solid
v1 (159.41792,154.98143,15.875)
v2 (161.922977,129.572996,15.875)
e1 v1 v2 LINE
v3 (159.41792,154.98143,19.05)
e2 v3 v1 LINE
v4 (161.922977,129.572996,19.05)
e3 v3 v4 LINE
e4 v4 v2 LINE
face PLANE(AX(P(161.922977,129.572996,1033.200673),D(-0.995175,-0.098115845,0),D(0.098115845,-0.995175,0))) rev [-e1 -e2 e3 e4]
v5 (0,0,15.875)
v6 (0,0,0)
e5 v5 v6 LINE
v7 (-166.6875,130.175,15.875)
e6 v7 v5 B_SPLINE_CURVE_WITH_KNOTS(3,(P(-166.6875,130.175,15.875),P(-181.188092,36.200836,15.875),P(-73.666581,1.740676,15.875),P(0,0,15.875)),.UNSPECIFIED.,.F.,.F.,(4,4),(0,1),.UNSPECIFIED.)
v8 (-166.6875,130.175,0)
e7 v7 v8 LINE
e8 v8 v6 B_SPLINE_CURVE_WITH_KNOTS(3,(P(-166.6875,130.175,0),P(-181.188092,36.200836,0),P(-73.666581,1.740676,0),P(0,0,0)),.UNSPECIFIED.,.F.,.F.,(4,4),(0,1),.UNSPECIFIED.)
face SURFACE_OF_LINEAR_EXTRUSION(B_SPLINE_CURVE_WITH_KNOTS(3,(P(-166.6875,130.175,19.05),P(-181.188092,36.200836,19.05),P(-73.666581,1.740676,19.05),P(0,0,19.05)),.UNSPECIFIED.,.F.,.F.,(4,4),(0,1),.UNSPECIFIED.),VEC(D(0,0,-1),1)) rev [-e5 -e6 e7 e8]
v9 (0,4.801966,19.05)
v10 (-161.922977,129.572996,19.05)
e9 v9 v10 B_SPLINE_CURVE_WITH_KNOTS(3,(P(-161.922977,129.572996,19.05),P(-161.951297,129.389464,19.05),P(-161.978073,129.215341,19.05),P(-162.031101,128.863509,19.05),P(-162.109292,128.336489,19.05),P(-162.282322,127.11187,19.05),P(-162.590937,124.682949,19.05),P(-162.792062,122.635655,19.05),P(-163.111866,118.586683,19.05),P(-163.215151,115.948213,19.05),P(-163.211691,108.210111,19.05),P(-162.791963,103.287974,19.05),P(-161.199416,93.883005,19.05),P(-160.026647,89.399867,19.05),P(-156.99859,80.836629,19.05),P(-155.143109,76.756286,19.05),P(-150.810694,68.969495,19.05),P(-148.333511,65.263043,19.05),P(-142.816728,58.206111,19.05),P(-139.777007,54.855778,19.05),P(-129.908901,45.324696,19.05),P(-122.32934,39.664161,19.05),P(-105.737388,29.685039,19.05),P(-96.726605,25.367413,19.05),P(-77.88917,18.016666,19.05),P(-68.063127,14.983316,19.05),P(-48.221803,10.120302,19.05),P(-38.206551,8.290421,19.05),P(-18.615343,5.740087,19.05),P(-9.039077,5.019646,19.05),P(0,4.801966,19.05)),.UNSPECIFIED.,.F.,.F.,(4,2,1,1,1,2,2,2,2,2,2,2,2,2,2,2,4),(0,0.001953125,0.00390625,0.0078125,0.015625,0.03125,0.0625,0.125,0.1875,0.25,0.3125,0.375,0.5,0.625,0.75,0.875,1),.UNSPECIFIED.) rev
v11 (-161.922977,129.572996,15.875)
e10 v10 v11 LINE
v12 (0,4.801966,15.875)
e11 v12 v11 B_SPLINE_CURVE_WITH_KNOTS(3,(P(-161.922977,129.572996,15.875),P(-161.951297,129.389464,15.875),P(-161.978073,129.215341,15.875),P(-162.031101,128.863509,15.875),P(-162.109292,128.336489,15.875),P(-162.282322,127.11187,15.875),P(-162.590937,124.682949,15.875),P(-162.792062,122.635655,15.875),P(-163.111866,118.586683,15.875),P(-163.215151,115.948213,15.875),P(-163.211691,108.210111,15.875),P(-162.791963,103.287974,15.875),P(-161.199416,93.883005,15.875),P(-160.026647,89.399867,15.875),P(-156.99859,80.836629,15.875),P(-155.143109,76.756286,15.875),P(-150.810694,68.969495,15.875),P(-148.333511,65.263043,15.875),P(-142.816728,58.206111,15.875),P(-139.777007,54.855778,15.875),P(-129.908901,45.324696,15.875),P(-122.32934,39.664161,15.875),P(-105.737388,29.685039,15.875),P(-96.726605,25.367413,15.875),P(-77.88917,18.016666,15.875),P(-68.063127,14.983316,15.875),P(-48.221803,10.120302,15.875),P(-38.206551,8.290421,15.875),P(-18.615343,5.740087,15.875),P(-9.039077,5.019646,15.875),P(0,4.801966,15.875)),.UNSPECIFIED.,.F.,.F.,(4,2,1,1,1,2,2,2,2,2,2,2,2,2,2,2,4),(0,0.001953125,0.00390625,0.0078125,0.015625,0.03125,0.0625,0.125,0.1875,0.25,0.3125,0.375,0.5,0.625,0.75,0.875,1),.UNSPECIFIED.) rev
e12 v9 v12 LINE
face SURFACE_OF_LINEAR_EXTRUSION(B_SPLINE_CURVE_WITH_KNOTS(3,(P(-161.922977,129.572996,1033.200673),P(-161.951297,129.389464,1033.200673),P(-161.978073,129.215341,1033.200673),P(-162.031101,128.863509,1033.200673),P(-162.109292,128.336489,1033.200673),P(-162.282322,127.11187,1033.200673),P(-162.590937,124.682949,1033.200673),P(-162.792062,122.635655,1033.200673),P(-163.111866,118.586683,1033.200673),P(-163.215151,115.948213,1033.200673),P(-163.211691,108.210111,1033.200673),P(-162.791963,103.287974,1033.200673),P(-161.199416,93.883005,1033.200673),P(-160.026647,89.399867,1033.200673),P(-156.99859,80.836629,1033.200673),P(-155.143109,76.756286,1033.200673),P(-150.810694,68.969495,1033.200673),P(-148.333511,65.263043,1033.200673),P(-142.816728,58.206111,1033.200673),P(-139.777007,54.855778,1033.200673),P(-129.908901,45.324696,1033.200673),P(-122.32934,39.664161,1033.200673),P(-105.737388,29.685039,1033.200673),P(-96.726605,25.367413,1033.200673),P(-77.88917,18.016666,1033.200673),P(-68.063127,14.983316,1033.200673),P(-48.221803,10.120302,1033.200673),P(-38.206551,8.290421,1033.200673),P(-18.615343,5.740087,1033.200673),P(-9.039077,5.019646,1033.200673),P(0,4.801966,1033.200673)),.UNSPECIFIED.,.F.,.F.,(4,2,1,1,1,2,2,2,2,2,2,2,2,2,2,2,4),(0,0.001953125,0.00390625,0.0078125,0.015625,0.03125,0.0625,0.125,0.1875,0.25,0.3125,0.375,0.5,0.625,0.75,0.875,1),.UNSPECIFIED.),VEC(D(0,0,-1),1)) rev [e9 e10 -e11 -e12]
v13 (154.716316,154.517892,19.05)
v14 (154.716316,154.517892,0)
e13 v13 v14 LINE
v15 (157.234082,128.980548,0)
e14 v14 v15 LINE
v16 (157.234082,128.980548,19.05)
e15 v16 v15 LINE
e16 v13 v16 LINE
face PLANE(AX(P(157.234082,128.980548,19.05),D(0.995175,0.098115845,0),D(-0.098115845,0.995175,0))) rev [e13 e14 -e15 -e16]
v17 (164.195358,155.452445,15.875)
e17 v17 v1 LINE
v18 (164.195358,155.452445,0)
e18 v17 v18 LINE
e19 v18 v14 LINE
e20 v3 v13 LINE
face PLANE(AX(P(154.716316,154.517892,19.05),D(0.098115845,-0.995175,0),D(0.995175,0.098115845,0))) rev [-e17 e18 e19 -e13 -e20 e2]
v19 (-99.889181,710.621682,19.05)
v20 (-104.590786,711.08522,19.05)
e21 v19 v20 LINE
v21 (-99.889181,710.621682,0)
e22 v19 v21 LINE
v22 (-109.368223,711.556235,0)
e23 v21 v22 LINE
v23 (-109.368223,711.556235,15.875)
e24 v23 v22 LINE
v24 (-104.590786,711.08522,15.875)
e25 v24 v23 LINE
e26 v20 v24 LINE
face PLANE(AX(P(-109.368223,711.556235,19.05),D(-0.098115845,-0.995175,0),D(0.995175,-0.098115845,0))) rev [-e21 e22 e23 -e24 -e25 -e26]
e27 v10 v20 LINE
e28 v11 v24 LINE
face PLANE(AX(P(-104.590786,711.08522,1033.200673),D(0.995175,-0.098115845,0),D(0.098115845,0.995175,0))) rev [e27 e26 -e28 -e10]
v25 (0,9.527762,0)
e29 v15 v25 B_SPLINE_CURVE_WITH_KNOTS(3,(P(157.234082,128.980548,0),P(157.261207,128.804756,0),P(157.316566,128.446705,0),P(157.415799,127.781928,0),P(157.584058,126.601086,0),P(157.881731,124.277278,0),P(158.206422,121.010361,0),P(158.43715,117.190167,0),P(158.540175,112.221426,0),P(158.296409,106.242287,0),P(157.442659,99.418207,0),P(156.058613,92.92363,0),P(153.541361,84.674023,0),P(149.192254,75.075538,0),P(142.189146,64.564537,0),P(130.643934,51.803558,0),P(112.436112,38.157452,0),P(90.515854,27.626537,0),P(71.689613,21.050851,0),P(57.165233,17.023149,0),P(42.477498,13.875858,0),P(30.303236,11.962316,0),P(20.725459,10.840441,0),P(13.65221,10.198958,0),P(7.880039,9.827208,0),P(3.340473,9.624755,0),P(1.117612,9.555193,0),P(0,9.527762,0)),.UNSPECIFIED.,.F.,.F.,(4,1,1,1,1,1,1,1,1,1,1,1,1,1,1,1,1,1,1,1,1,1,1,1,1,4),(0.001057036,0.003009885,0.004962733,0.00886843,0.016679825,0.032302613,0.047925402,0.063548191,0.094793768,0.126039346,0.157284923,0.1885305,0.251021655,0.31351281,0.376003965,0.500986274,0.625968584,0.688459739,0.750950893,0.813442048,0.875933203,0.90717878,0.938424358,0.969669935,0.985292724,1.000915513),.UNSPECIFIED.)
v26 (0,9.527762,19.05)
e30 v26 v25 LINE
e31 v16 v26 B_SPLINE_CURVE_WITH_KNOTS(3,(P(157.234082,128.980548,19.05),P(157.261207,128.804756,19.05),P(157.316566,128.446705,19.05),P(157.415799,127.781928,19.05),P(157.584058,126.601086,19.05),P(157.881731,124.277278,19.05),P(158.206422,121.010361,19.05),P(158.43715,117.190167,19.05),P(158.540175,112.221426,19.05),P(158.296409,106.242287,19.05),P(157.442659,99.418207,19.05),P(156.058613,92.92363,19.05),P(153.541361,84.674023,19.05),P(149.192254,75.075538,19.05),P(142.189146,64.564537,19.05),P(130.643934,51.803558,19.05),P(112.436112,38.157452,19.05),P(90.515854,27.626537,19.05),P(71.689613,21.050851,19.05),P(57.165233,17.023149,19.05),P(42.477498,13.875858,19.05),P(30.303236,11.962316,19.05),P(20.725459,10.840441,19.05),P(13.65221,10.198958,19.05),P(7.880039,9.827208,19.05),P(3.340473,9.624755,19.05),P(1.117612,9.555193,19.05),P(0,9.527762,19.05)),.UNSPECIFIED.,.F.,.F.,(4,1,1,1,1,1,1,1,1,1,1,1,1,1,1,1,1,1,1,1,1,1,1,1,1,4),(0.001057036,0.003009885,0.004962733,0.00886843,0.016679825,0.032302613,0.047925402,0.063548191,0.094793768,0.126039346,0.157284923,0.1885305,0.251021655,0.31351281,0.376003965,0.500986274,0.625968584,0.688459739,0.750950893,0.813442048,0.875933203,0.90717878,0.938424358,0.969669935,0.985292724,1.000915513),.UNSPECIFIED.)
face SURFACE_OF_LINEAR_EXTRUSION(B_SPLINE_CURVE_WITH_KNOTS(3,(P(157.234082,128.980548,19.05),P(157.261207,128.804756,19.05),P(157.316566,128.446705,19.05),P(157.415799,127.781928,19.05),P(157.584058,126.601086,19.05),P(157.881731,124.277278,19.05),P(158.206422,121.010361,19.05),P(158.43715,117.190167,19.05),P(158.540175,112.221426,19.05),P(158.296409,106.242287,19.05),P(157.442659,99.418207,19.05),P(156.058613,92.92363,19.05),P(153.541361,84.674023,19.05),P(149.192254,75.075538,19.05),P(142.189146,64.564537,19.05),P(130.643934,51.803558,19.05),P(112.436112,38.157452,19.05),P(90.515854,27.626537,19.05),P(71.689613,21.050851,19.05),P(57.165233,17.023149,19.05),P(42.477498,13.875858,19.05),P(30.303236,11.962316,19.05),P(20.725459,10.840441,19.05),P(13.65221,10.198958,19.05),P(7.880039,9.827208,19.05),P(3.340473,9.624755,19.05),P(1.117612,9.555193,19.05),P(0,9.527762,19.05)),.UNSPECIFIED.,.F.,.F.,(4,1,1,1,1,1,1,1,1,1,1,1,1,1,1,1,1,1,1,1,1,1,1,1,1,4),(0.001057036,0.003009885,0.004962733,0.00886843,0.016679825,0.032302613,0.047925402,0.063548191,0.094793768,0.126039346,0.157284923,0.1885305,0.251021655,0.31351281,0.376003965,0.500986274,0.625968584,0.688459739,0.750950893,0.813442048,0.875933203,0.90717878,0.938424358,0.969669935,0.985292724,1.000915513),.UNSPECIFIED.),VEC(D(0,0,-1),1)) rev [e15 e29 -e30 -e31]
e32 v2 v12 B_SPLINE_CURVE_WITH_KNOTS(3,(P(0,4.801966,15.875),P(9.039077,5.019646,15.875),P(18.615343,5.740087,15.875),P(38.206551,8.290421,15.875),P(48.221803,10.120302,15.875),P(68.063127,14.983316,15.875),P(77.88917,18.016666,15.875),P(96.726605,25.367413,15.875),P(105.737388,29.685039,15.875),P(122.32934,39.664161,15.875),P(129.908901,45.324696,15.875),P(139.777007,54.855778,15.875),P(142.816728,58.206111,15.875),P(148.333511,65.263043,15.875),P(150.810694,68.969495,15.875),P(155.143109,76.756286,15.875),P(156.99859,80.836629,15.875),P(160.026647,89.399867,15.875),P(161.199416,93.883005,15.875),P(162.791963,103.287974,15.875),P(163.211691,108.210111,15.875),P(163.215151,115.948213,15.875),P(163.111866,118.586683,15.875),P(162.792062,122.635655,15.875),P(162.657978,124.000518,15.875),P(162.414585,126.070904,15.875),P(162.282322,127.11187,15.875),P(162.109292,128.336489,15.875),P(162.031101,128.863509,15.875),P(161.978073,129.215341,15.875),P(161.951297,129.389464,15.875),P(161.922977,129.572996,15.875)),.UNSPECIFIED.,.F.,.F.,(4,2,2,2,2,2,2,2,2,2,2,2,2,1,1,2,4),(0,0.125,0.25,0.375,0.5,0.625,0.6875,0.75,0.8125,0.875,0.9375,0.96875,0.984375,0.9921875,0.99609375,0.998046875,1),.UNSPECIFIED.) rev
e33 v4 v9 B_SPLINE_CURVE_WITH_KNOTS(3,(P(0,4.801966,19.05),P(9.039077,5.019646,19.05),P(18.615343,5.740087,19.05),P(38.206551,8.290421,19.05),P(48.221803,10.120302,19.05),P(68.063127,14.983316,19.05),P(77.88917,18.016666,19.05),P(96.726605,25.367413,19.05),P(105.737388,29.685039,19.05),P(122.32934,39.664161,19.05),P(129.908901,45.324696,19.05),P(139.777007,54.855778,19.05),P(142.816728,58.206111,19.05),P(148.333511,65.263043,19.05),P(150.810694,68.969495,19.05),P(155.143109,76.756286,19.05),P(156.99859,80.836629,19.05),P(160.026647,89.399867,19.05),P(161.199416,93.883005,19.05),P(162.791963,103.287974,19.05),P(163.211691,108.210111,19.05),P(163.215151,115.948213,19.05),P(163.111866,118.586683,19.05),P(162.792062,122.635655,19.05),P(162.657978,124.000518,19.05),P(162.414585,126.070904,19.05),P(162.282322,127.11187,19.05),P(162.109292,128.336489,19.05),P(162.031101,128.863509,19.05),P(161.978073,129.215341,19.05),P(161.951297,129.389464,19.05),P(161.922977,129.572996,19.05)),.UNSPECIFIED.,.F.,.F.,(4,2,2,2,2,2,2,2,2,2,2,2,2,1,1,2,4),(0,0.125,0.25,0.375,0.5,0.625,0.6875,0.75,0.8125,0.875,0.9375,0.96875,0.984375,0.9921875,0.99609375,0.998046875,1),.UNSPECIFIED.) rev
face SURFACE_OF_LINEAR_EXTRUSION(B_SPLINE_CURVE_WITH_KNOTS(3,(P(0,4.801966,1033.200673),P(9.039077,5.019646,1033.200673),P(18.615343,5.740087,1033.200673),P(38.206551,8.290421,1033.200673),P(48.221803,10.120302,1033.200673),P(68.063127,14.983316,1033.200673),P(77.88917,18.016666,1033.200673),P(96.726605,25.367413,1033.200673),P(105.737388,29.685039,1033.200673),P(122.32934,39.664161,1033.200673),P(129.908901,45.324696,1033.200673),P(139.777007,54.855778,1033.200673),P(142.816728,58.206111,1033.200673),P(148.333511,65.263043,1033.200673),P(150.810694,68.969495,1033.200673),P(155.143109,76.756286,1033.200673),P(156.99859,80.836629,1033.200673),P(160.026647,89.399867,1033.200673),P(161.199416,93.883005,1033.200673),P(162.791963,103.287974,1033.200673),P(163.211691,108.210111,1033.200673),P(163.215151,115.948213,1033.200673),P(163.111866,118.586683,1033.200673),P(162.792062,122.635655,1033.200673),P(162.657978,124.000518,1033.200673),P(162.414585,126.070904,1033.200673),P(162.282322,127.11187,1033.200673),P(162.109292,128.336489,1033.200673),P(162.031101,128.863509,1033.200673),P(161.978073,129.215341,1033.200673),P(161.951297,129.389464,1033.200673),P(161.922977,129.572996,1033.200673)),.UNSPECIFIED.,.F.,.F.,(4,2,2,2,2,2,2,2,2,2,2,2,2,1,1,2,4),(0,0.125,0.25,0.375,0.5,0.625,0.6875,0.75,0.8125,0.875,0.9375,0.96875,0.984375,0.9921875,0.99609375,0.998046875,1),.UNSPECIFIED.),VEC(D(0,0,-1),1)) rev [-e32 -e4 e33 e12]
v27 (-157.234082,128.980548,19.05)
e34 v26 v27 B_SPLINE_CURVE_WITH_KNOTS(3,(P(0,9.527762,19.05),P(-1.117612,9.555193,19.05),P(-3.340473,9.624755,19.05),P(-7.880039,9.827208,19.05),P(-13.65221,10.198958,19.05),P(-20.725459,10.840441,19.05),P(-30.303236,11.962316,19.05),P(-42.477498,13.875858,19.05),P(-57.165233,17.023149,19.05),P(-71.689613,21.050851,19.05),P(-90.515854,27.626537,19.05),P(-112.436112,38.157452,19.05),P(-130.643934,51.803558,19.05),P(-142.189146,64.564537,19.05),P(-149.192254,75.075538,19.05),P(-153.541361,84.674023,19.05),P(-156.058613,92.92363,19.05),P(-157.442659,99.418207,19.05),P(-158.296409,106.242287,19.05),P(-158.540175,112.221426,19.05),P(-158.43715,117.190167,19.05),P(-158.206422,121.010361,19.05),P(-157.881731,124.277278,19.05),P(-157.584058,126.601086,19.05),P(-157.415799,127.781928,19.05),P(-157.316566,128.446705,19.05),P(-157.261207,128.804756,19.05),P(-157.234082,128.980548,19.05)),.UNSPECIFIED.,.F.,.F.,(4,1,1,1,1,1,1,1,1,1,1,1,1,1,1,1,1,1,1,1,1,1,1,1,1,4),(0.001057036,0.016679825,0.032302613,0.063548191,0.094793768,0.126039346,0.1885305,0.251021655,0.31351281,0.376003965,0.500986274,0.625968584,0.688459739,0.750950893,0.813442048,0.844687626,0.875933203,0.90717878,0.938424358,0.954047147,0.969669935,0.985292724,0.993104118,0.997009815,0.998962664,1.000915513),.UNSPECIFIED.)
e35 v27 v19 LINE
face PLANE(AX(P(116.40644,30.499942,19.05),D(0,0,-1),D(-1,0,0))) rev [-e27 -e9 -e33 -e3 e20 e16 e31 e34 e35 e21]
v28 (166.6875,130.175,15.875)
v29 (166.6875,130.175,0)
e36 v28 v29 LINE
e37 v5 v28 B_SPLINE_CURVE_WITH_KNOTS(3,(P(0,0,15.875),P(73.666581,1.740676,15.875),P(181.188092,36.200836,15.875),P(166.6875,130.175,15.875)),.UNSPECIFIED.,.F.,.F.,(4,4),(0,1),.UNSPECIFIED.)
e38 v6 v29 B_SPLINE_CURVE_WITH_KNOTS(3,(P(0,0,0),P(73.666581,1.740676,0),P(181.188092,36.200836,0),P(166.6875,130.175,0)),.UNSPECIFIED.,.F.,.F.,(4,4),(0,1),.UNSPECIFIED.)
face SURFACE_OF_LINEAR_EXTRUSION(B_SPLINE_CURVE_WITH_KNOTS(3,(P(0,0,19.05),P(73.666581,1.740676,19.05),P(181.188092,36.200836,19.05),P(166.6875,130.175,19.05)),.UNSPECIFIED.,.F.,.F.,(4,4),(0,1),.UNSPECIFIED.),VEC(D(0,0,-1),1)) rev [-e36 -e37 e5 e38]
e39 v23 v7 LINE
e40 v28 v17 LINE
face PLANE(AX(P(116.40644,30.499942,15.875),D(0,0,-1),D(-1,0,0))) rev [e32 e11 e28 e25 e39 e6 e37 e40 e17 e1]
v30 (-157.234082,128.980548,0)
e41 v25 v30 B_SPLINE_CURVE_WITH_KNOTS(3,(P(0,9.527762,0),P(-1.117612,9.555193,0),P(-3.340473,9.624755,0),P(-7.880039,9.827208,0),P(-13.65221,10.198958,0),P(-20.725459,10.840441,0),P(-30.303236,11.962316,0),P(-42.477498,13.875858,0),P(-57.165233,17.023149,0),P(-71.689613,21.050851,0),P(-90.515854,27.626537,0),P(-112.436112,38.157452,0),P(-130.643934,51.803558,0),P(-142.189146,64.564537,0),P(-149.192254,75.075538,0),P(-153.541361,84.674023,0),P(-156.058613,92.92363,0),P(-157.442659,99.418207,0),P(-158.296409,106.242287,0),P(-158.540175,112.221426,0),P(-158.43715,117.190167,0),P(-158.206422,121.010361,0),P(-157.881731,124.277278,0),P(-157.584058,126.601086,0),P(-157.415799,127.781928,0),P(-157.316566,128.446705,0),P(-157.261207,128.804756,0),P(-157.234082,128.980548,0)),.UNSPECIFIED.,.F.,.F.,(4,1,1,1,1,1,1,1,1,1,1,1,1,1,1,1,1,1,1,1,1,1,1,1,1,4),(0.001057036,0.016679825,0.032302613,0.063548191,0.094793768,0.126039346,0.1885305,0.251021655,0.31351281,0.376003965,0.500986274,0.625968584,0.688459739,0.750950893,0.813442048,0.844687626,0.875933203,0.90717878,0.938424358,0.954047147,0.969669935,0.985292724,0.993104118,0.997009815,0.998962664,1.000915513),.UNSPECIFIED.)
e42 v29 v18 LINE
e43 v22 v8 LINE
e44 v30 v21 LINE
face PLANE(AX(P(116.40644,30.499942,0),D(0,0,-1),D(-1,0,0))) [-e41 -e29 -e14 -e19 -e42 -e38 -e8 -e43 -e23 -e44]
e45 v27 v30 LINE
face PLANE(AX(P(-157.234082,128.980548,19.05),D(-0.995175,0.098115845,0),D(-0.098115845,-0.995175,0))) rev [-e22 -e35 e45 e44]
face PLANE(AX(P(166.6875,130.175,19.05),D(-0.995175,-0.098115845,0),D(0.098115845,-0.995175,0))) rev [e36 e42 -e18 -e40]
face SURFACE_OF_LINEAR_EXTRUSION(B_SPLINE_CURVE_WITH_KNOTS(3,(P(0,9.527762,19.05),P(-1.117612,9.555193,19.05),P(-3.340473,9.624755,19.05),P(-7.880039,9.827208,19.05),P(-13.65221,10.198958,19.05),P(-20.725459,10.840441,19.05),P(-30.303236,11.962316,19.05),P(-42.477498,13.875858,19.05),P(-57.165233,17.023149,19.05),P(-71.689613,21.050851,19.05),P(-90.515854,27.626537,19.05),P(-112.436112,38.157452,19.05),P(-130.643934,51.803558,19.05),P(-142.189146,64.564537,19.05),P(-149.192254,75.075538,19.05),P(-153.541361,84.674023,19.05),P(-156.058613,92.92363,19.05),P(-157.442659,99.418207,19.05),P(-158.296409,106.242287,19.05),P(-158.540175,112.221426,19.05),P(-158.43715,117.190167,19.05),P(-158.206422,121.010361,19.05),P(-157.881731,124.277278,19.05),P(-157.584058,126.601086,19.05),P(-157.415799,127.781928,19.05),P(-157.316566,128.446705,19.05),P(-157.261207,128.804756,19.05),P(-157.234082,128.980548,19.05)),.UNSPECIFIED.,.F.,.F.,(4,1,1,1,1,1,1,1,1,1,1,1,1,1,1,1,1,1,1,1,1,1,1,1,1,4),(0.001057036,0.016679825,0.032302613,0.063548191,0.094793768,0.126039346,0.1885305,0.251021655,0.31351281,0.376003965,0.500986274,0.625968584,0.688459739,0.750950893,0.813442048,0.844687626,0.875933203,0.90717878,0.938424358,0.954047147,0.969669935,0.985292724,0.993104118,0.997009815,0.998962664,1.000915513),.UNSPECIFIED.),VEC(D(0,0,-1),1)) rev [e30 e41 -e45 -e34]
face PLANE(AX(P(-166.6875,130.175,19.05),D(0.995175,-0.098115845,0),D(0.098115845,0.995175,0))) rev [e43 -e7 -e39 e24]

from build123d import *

# Parameters (mm, degrees)
BOSS_EXTRUDE1_DEPTH = 19.05
CUT_EXTRUDE1_START  = -3.175
CUT_EXTRUDE1_DEPTH  = 3.175


# Read off the part's stored shape, not the designer's step: Cut-Extrude1
with BuildPart() as part:
    # Sketch1 → Boss-Extrude1 (new body)
    with BuildSketch(Plane.XY):
        with BuildLine():
            Line((157.234081882, 128.980548454), (154.716315658, 154.51789158))
            Line((154.716315658, 154.51789158), (164.195357535, 155.452445004))
            Line((164.195357535, 155.452445004), (166.6875, 130.175))
            add(Edge.make_bspline(
                [(0, 0), (73.666580622, 1.740675992), (181.188092361, 36.200835609), (166.6875, 130.175)],
                knots=[0, 0, 0, 0, 1, 1, 1, 1], degree=3))
            add(Edge.make_bspline(
                [(0, 0), (-73.666580622, 1.740675992), (-181.188092361, 36.200835609), (-166.6875, 130.175)],
                knots=[0, 0, 0, 0, 1, 1, 1, 1], degree=3))
            Line((-166.6875, 130.175), (-109.368223301, 711.556235093))
            Line((-109.368223301, 711.556235093), (-99.889181424, 710.621681669))
            Line((-99.889181424, 710.621681669), (-157.234081882, 128.980548454))
            add(Edge.make_bspline(
                [(0, 9.52776174), (-1.117611602, 9.555193192), (-3.340472897, 9.624755056), (-7.880039481, 9.827207732), (-13.652210416, 10.198958437), (-20.725459036, 10.840441372), (-30.303235723, 11.962316267), (-42.47749757, 13.875858033), (-57.165232888, 17.02314898), (-71.689613059, 21.050850851), (-90.515854195, 27.626537064), (-112.436111514, 38.157452487), (-130.643933928, 51.803557723), (-142.189146149, 64.564536934), (-149.192253507, 75.075537554), (-153.541361304, 84.674022673), (-156.058613173, 92.923629982), (-157.442658539, 99.418206789), (-158.29640922, 106.242287005), (-158.540175044, 112.221426054), (-158.437150466, 117.190167219), (-158.20642164, 121.010360535), (-157.881730698, 124.277278241), (-157.584058118, 126.601085874), (-157.415798733, 127.781927866), (-157.316566229, 128.446705395), (-157.261207353, 128.804756083), (-157.234081882, 128.980548454)],
                knots=[0.001057036, 0.001057036, 0.001057036, 0.001057036, 0.016679825, 0.032302613, 0.063548191, 0.094793768, 0.126039346, 0.1885305, 0.251021655, 0.31351281, 0.376003965, 0.500986274, 0.625968584, 0.688459739, 0.750950893, 0.813442048, 0.844687626, 0.875933203, 0.90717878, 0.938424358, 0.954047147, 0.969669935, 0.985292724, 0.993104118, 0.997009815, 0.998962664, 1.000915513, 1.000915513, 1.000915513, 1.000915513], degree=3))
            add(Edge.make_bspline(
                [(157.234081882, 128.980548454), (157.261207353, 128.804756083), (157.316566229, 128.446705395), (157.415798733, 127.781927866), (157.584058118, 126.601085874), (157.881730698, 124.277278241), (158.20642164, 121.010360535), (158.437150466, 117.190167219), (158.540175044, 112.221426054), (158.29640922, 106.242287005), (157.442658539, 99.418206789), (156.058613173, 92.923629982), (153.541361304, 84.674022673), (149.192253507, 75.075537554), (142.189146149, 64.564536934), (130.643933928, 51.803557723), (112.436111514, 38.157452487), (90.515854195, 27.626537064), (71.689613059, 21.050850851), (57.165232888, 17.02314898), (42.47749757, 13.875858033), (30.303235723, 11.962316267), (20.725459036, 10.840441372), (13.652210416, 10.198958437), (7.880039481, 9.827207732), (3.340472897, 9.624755056), (1.117611602, 9.555193192), (0, 9.52776174)],
                knots=[0.001057036, 0.001057036, 0.001057036, 0.001057036, 0.003009885, 0.004962733, 0.00886843, 0.016679825, 0.032302613, 0.047925402, 0.063548191, 0.094793768, 0.126039346, 0.157284923, 0.1885305, 0.251021655, 0.31351281, 0.376003965, 0.500986274, 0.625968584, 0.688459739, 0.750950893, 0.813442048, 0.875933203, 0.90717878, 0.938424358, 0.969669935, 0.985292724, 1.000915513, 1.000915513, 1.000915513, 1.000915513], degree=3))
        make_face()
    extrude(amount=BOSS_EXTRUDE1_DEPTH)

    # Cut-Extrude1 outline → Cut-Extrude1 (cut)
    with BuildSketch(Plane.XY.offset(19.05).offset(CUT_EXTRUDE1_START)):
        with BuildLine():
            add(Edge.make_bspline(
                [(0, 4.801965673), (9.039076986, 5.019645615), (18.615343357, 5.740087083), (38.206551494, 8.290420977), (48.221803102, 10.120302171), (68.063126794, 14.983315661), (77.889169822, 18.016665839), (96.726604846, 25.367412999), (105.737388343, 29.685039413), (122.329339782, 39.664160586), (129.908900725, 45.324695844), (139.777007016, 54.855777785), (142.816728459, 58.206110887), (148.333510848, 65.263042796), (150.810694166, 68.969494834), (155.143109198, 76.756286204), (156.998589935, 80.836629029), (160.026646994, 89.399867478), (161.199415591, 93.883005077), (162.79196327, 103.287974059), (163.211691294, 108.210111051), (163.215151327, 115.948212654), (163.111865799, 118.586683423), (162.792061754, 122.635654517), (162.657978395, 124.000517644), (162.414585492, 126.070904339), (162.282321945, 127.11187023), (162.109292482, 128.336489493), (162.031100506, 128.86350908), (161.978072787, 129.215341168), (161.951296998, 129.389464404), (161.922977269, 129.572996421)],
                knots=[0, 0, 0, 0, 0.125, 0.125, 0.25, 0.25, 0.375, 0.375, 0.5, 0.5, 0.625, 0.625, 0.6875, 0.6875, 0.75, 0.75, 0.8125, 0.8125, 0.875, 0.875, 0.9375, 0.9375, 0.96875, 0.96875, 0.984375, 0.984375, 0.9921875, 0.99609375, 0.998046875, 0.998046875, 1, 1, 1, 1], degree=3))
            add(Edge.make_bspline(
                [(-161.922977269, 129.572996421), (-161.951296998, 129.389464404), (-161.978072787, 129.215341168), (-162.031100506, 128.86350908), (-162.109292482, 128.336489493), (-162.282321945, 127.11187023), (-162.590936716, 124.682949208), (-162.792061754, 122.635654517), (-163.111865799, 118.586683423), (-163.215151327, 115.948212654), (-163.211691294, 108.210111051), (-162.79196327, 103.287974059), (-161.199415591, 93.883005077), (-160.026646994, 89.399867478), (-156.998589935, 80.836629029), (-155.143109198, 76.756286204), (-150.810694166, 68.969494834), (-148.333510848, 65.263042796), (-142.816728459, 58.206110887), (-139.777007016, 54.855777785), (-129.908900725, 45.324695844), (-122.329339782, 39.664160586), (-105.737388343, 29.685039413), (-96.726604846, 25.367412999), (-77.889169822, 18.016665839), (-68.063126794, 14.983315661), (-48.221803102, 10.120302171), (-38.206551494, 8.290420977), (-18.615343357, 5.740087083), (-9.039076986, 5.019645615), (0, 4.801965673)],
                knots=[0, 0, 0, 0, 0.001953125, 0.001953125, 0.00390625, 0.0078125, 0.015625, 0.03125, 0.03125, 0.0625, 0.0625, 0.125, 0.125, 0.1875, 0.1875, 0.25, 0.25, 0.3125, 0.3125, 0.375, 0.375, 0.5, 0.5, 0.625, 0.625, 0.75, 0.75, 0.875, 0.875, 1, 1, 1, 1], degree=3))
            Line((-161.922977269, 129.572996421), (-104.590786195, 711.085220167))
            Line((-104.590786195, 711.085220167), (-109.368223301, 711.556235093))
            Line((-109.368223301, 711.556235093), (-166.6875, 130.175))
            add(Edge.make_bspline(
                [(-166.6875, 130.175), (-181.188092361, 36.200835609), (-73.666580622, 1.740675992), (0, 0)],
                knots=[0, 0, 0, 0, 1, 1, 1, 1], degree=3))
            add(Edge.make_bspline(
                [(0, 0), (73.666580622, 1.740675992), (181.188092361, 36.200835609), (166.6875, 130.175)],
                knots=[0, 0, 0, 0, 1, 1, 1, 1], degree=3))
            Line((166.6875, 130.175), (164.195357535, 155.452445004))
            Line((164.195357535, 155.452445004), (159.417920429, 154.981430078))
            Line((159.417920429, 154.981430078), (161.922977269, 129.572996421))
        make_face()
    extrude(amount=CUT_EXTRUDE1_DEPTH, mode=Mode.SUBTRACT)


solid = part.part
